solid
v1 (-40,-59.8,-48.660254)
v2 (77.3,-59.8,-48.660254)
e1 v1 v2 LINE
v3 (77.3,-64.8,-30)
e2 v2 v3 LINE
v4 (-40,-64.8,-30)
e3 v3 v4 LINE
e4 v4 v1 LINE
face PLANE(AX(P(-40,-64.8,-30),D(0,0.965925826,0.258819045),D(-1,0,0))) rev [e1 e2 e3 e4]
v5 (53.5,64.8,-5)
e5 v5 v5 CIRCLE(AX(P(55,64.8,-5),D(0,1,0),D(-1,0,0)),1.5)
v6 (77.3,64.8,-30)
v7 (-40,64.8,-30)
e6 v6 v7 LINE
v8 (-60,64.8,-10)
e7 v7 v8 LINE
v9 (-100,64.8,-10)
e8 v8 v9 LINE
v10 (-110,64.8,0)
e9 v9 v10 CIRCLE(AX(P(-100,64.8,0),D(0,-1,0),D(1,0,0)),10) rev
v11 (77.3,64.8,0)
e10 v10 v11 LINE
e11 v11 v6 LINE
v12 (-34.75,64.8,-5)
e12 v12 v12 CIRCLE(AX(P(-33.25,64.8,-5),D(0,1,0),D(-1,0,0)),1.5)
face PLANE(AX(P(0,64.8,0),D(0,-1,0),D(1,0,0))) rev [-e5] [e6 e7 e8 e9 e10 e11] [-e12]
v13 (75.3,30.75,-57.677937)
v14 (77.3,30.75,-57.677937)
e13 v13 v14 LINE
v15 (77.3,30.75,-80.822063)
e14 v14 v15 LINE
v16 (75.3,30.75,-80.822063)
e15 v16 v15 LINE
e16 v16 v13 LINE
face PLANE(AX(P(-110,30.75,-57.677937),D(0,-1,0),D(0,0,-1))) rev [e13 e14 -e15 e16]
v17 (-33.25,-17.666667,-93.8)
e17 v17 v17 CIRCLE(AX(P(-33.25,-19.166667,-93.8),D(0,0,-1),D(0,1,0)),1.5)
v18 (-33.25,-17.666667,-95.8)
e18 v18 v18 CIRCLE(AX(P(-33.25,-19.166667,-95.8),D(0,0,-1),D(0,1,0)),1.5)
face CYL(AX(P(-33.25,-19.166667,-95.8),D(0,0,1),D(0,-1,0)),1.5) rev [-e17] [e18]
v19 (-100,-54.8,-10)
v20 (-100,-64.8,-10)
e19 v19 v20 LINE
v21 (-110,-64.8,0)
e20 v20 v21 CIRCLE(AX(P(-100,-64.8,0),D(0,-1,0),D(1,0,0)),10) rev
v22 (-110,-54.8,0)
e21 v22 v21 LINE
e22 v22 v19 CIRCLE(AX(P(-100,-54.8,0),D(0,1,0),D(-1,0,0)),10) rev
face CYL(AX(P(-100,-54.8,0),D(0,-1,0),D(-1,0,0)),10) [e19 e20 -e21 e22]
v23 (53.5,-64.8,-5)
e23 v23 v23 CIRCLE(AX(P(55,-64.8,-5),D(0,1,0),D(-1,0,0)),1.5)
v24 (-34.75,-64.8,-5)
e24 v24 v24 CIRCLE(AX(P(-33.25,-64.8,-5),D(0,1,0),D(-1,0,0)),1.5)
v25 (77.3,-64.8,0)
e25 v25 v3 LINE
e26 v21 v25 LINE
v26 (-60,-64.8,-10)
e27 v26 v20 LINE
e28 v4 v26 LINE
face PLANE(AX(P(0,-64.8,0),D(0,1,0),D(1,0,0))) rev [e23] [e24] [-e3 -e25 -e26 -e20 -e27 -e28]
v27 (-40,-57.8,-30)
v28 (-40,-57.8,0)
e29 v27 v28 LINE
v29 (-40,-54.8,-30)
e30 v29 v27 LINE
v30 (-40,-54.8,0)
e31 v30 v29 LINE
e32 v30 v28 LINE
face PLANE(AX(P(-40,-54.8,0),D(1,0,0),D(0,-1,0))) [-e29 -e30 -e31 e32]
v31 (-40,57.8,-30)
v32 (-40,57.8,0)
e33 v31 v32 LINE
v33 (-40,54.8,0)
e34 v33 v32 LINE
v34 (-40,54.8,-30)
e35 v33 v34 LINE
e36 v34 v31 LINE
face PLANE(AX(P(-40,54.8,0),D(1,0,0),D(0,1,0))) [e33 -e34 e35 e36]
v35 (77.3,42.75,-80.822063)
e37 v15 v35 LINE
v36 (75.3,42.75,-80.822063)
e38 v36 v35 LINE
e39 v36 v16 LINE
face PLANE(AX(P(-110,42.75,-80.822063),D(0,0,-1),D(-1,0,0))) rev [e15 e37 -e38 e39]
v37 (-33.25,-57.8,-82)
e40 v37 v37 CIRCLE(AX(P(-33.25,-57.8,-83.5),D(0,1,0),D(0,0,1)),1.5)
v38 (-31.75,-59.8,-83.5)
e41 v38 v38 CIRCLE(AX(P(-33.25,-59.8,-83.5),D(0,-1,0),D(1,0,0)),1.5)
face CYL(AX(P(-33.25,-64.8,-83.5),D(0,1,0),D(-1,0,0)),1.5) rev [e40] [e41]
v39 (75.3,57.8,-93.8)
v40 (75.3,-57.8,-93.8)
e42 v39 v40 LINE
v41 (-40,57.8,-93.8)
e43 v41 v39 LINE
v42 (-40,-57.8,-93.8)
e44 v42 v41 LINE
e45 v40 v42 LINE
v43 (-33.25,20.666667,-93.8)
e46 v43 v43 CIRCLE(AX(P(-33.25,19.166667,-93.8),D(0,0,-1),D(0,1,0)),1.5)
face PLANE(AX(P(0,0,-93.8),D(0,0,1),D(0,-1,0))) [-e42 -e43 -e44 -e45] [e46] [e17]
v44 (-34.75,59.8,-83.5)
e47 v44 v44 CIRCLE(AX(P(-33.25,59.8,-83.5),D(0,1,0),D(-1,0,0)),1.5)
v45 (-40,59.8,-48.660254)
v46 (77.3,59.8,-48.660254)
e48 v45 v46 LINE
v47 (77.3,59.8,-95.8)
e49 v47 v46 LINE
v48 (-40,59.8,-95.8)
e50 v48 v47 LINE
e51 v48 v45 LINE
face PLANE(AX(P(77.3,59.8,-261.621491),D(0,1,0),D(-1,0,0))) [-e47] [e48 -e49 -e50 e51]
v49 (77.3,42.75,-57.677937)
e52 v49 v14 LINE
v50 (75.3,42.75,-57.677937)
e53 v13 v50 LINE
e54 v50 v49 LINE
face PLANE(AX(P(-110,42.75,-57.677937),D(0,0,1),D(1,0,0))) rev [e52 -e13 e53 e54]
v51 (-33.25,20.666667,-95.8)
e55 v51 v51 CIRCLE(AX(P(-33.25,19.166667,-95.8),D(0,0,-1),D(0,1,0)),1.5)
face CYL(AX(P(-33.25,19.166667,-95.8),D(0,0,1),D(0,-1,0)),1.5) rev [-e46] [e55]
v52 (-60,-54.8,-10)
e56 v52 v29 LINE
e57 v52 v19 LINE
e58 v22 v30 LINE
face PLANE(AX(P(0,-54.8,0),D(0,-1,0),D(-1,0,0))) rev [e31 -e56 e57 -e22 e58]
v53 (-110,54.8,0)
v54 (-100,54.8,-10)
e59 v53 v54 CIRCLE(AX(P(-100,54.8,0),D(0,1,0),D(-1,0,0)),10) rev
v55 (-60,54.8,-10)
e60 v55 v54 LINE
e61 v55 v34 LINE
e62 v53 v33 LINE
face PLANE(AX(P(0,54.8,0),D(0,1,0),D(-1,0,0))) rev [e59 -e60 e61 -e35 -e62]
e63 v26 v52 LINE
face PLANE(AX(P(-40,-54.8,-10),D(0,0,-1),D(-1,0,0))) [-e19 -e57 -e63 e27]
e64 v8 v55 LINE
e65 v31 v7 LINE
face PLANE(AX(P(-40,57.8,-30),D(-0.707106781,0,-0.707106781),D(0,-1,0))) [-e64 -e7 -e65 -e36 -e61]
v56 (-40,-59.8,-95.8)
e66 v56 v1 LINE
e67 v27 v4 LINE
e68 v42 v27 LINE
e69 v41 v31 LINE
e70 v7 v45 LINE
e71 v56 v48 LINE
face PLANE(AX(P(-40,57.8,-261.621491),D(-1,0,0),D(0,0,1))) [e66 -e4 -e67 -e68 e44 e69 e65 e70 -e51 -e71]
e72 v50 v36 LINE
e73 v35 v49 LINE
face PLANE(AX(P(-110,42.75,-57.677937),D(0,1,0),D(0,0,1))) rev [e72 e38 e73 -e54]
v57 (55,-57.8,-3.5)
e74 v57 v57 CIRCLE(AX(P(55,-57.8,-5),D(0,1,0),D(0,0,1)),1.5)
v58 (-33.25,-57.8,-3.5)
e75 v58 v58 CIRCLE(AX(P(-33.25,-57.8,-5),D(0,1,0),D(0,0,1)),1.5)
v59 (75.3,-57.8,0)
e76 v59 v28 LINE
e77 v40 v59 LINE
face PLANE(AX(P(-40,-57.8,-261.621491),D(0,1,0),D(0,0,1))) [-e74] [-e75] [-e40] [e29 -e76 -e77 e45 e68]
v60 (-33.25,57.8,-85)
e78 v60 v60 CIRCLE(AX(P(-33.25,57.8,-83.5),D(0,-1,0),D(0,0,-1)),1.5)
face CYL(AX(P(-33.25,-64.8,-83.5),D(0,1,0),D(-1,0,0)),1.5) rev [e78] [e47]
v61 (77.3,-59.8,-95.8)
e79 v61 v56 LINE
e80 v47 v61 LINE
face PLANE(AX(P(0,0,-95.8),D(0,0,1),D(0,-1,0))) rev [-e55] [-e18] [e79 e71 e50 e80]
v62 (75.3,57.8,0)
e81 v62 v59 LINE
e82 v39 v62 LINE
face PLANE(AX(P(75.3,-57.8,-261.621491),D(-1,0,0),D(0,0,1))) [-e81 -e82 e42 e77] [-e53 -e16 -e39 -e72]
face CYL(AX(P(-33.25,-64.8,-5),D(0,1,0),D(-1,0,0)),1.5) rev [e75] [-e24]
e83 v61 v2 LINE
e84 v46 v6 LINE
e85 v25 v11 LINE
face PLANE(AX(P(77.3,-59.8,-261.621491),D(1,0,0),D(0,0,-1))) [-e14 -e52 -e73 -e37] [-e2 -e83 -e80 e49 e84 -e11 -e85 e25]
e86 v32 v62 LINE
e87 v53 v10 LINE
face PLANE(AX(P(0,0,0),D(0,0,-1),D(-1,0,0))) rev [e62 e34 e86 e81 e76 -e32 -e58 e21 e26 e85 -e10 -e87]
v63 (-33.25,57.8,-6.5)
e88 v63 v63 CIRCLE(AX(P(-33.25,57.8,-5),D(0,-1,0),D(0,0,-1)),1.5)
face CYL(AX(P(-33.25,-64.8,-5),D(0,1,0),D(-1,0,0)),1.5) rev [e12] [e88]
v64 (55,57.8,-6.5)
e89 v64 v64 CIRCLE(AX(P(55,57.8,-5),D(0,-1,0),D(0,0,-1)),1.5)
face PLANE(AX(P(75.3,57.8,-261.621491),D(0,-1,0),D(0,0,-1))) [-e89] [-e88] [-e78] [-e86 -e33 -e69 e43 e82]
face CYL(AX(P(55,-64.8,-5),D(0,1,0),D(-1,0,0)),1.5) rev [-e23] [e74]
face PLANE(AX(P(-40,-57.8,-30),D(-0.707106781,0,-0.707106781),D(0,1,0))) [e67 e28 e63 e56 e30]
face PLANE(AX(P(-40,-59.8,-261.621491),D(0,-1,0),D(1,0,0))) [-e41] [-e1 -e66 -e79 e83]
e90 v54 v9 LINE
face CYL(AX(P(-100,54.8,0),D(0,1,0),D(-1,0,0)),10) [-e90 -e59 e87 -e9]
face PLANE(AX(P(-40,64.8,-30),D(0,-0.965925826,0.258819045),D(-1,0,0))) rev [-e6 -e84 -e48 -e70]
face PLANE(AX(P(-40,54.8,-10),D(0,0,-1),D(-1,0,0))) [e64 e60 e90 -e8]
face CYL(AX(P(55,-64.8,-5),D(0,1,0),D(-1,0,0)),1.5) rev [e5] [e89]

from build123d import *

# Parameters (mm, degrees)
BOSS_EXTRUDE1_DEPTH     = 93.8
SKETCH2_W               = 117.3
SKETCH2_H               = 119.6
SKETCH2_R               = 1.5
BOSS_EXTRUDE2_DEPTH     = 2
SKETCH5_W               = 70
SKETCH5_H               = 10
BOSS_EXTRUDE3_DEPTH     = 5
BOSS_EXTRUDE4_DEPTH     = 5
CHAMFER1_SIZE           = 20
BOSS_EXTRUDE5_DEPTH     = 3
CHAMFER2_SIZE2          = 18.660254038
CHAMFER2_SIZE           = 5
FILLET1_R               = 10
SKETCH4_W               = 23.144126226
SKETCH4_H               = 12
CUT_EXTRUDE2_DEPTH      = 221.131710573
CUT_EXTRUDE1_DEPTH      = 192.840558798
CUT_EXTRUDE1_DEPTH_BACK = 192.840558798
SKETCH3_R               = 1.5


with BuildPart() as part:
    # Sketch1 → Boss-Extrude1 (new body)
    with BuildSketch(Plane.XY):
        Polygon((-40, -57.8), (75.3, -57.8), (75.3, 57.8), (-40, 57.8), (-40, 59.8), (77.3, 59.8), (77.3, -59.8), (-40, -59.8), align=None)
    extrude(amount=-BOSS_EXTRUDE1_DEPTH)

    # Sketch2 → Boss-Extrude2 (add)
    with BuildSketch(Plane(origin=(0, 0, -93.8), x_dir=(-1, 0, 0), z_dir=(0, 0, -1))):
        with Locations((-18.65, 0)):
            Rectangle(SKETCH2_W, SKETCH2_H)
        with Locations(Location((33.25, -19.166666667, 0), (0, 0, 90))):
            Circle(SKETCH2_R, mode=Mode.SUBTRACT)
        with Locations(Location((33.25, 19.166666667, 0), (0, 0, 90))):
            Circle(SKETCH2_R, mode=Mode.SUBTRACT)
    extrude(amount=BOSS_EXTRUDE2_DEPTH)

    # Sketch5 → Boss-Extrude3 (add)
    with BuildSketch(Plane(origin=(0, 59.8, 0), x_dir=(1, 0, 0), z_dir=(0, 1, 0))):
        with Locations((-75, 5)):
            Rectangle(SKETCH5_W, SKETCH5_H)
    extrude(amount=-BOSS_EXTRUDE3_DEPTH)

    # Sketch6 → Boss-Extrude4 (add)
    with BuildSketch(Plane(origin=(0, 59.8, 0), x_dir=(1, 0, 0), z_dir=(0, 1, 0))):
        Polygon((-110, 10), (-40, 10), (-40, 30), (77.3, 30), (77.3, 0), (0, 0), (-110, 0), align=None)
    extrude(amount=BOSS_EXTRUDE4_DEPTH)

    # Chamfer1
    chamfer1_edges = [part.edges().sort_by_distance(p)[0] for p in [
        (-40, 61.3, -10),
    ]]
    chamfer(chamfer1_edges, length=CHAMFER1_SIZE)

    # Sketch7 → Boss-Extrude5 (add)
    with BuildSketch(Plane.XZ.offset(-57.8)):
        Polygon((-60, -10), (-40, -30), (-40, -10), align=None)
    extrude(amount=BOSS_EXTRUDE5_DEPTH)

    # Chamfer2
    chamfer2_edges = [part.edges().sort_by_distance(p)[0] for p in [
        (18.65, 59.8, -30),
    ]]
    chamfer2_side = [part.faces().sort_by_distance(p)[0] for p in [
        (18.65, 59.9, -30),
    ]]
    chamfer(chamfer2_edges, length=CHAMFER2_SIZE - 0.0001, length2=CHAMFER2_SIZE2 - 0.0001, reference=chamfer2_side[0])  # a hair under: the kernel refuses the full size

    # Fillet1
    fillet1_edges = [part.edges().sort_by_distance(p)[0] for p in [
        (-110, 59.8, -10),
    ]]
    fillet(fillet1_edges, radius=FILLET1_R - 0.0001)  # a hair under: the kernel refuses the full size

    # Mirror5: part across plane


with BuildPart() as part_1:
    add(part.part)
    add(part.part.mirror(Plane.ZX))

    # Sketch4 → Cut-Extrude2 (cut, through all)
    with BuildSketch(Plane(origin=(77.3, 0, 0), x_dir=(0, 0, -1), z_dir=(1, 0, 0))):
        with Locations((69.25, 36.75)):
            Rectangle(SKETCH4_W, SKETCH4_H)
    extrude(amount=-CUT_EXTRUDE2_DEPTH, mode=Mode.SUBTRACT)

    # Sketch3 → Cut-Extrude1 (cut, two sides: drawn at the far end of the back side and taken through both)
    with BuildSketch(Plane(origin=(0, 59.8, 0), x_dir=(1, 0, 0), z_dir=(0, 1, 0)).offset(-CUT_EXTRUDE1_DEPTH_BACK)):
        with Locations(Location((55, 5, 0), (0, 0, 180))):
            Circle(SKETCH3_R)
        with Locations(Location((-33.25, 5, 0), (0, 0, 180))):
            Circle(SKETCH3_R)
        with Locations(Location((-33.25, 83.5, 0), (0, 0, 270))):
            Circle(SKETCH3_R)
    extrude(amount=CUT_EXTRUDE1_DEPTH + CUT_EXTRUDE1_DEPTH_BACK, mode=Mode.SUBTRACT)


solid = part_1.part
